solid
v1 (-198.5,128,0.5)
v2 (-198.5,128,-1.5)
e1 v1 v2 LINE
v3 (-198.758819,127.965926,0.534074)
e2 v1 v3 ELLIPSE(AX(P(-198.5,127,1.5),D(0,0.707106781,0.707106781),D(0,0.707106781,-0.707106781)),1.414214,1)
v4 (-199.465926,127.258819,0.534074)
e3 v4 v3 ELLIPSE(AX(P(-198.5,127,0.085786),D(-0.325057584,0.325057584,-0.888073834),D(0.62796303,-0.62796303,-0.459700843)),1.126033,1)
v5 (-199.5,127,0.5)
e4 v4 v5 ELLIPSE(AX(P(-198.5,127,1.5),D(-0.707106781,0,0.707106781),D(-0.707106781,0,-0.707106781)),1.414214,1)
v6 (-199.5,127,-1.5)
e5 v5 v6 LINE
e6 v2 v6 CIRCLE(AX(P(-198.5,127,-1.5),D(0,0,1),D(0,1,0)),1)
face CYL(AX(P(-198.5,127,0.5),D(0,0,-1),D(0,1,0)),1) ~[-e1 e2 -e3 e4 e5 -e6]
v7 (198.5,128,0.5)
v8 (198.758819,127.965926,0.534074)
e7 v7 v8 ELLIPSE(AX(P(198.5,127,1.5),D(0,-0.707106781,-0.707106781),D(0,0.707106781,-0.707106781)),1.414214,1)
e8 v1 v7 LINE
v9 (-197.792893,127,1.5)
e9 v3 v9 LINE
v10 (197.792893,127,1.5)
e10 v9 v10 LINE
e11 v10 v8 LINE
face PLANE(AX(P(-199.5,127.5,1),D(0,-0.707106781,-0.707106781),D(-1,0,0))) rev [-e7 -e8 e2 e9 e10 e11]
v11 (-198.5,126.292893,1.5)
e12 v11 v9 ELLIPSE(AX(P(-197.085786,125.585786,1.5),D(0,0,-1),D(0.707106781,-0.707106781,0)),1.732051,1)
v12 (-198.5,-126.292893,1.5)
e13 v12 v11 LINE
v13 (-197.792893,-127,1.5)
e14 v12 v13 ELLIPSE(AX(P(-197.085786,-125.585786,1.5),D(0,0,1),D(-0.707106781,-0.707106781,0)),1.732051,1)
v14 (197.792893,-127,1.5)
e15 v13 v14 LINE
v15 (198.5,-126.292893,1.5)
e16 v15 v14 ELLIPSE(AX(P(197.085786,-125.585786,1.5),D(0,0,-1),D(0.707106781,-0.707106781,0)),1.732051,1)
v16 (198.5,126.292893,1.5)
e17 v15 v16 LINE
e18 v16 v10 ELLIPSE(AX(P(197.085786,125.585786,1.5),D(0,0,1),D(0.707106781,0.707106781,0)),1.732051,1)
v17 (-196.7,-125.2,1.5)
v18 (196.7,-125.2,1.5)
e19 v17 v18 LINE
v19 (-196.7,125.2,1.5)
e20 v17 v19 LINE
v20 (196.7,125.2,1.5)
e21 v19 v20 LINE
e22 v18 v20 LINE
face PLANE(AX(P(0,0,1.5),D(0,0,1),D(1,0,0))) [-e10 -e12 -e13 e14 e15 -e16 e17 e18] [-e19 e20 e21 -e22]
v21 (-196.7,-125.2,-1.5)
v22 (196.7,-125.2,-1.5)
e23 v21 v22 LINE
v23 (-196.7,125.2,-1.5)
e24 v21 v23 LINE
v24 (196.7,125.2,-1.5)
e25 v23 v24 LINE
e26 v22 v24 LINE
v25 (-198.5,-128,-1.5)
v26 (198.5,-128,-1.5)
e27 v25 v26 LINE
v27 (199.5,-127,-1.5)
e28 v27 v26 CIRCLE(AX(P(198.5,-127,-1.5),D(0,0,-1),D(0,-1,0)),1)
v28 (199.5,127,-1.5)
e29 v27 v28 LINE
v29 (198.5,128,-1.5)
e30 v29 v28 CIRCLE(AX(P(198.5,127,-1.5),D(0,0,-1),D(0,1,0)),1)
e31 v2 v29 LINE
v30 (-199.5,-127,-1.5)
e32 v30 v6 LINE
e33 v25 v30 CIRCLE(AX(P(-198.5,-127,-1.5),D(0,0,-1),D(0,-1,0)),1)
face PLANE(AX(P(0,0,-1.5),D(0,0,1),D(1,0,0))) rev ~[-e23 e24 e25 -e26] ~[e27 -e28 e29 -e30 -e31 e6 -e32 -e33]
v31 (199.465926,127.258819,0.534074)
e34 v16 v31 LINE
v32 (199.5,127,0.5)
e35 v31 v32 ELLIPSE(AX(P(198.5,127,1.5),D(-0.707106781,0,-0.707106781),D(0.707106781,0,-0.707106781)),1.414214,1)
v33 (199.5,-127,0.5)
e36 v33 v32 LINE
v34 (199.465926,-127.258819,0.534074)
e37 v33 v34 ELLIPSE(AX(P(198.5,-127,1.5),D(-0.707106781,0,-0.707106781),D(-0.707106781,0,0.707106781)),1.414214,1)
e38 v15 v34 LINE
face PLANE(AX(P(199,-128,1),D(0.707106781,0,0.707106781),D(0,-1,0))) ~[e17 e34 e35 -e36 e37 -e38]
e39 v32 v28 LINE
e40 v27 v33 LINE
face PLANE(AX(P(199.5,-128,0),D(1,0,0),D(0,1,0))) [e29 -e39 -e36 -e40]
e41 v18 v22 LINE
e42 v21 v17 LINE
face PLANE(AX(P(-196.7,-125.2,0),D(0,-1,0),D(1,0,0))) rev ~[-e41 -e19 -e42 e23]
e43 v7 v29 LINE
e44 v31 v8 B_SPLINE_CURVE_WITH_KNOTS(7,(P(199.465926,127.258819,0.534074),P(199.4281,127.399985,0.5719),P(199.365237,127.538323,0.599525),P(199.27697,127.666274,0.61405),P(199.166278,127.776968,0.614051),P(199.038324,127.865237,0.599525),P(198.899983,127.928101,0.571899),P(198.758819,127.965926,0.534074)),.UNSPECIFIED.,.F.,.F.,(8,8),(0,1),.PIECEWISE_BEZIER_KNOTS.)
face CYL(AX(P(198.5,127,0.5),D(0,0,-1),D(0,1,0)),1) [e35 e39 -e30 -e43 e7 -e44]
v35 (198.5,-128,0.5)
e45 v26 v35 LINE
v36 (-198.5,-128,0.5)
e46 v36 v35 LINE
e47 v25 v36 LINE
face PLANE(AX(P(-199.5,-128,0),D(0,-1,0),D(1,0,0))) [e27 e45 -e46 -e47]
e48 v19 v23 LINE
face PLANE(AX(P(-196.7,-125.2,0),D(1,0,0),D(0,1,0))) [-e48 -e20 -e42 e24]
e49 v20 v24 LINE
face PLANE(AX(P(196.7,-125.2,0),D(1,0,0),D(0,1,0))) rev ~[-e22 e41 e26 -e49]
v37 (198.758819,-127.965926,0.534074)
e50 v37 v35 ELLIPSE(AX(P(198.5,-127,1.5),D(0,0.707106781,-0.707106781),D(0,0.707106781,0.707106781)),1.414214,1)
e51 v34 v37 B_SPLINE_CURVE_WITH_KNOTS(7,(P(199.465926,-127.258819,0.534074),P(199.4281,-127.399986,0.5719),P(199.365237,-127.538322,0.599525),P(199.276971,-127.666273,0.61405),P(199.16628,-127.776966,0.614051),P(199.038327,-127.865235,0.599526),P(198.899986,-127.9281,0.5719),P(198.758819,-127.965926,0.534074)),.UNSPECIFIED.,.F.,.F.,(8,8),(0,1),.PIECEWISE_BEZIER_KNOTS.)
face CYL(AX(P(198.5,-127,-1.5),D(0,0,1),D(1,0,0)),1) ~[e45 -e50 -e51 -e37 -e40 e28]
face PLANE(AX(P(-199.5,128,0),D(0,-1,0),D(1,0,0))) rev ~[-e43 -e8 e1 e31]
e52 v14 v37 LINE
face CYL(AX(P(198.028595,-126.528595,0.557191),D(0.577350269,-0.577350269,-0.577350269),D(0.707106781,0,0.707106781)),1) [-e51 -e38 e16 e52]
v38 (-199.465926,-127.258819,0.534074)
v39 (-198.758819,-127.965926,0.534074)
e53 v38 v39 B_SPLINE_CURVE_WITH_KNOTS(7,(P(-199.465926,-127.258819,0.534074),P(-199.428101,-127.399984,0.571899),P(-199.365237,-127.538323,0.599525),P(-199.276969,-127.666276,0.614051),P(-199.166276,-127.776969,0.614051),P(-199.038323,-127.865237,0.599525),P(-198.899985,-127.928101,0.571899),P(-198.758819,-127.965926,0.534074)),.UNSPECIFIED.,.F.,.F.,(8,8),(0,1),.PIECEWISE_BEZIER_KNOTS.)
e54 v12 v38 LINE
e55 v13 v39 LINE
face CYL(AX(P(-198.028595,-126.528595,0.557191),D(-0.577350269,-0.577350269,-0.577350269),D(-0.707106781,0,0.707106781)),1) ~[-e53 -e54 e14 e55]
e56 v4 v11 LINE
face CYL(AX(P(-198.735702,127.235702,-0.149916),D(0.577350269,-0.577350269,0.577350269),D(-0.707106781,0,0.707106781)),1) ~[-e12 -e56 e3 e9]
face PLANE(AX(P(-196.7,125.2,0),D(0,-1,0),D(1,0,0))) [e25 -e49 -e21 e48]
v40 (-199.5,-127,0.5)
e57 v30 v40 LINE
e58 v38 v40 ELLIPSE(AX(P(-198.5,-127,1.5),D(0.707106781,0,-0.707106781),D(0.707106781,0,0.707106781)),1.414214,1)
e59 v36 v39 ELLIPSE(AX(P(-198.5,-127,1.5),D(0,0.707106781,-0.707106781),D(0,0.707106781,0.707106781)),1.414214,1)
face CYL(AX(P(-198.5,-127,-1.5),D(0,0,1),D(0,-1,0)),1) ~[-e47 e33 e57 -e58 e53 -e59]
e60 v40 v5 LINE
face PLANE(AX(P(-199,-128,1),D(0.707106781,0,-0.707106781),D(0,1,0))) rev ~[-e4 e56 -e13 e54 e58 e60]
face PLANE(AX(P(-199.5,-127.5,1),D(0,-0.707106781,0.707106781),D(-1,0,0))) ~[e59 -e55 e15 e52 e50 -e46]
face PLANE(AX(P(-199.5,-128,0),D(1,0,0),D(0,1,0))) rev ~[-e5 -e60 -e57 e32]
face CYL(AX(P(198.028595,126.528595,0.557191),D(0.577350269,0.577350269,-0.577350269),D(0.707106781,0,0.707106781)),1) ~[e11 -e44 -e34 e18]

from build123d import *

# Parameters (mm, degrees)
F0_W     = 399
F0_H     = 256
F0_W_2   = 393.4
F0_H_2   = 250.4
F1_DEPTH = 1.5
F2_SIZE  = 1
F3_F1_R  = 1
F3_F2_R  = 1
F3_F3_R  = 1
F3_F4_R  = 1
F3_F5_R  = 1
F3_F6_R  = 1
F3_F7_R  = 1
F3_F8_R  = 1


with BuildPart() as f1:
    # F0 (on Top) → F1 (new body, symmetric)
    with BuildSketch(Plane.XY):
        Rectangle(F0_W, F0_H)
        Rectangle(F0_W_2, F0_H_2, mode=Mode.SUBTRACT)
    extrude(amount=F1_DEPTH, both=True)

    # F2
    f2_edges = [f1.edges().sort_by_distance(p)[0] for p in [
        (0, -128, 1.5),
        (-199.5, 0, 1.5),
        (0, 128, 1.5),
        (199.5, 0, 1.5),
    ]]
    chamfer(f2_edges, length=F2_SIZE)

    # F3: fillet of radius 1 on 8 edges, made by hand

    # F3_f1
    f3_f1_edges = [f1.edges().sort_by_distance(p)[0] for p in [
        (199.5, 128, -0.5),
    ]]
    fillet(f3_f1_edges, radius=F3_F1_R)

    # F3_f2
    f3_f2_edges = [f1.edges().sort_by_distance(p)[0] for p in [
        (199.5, -128, -0.5),
    ]]
    fillet(f3_f2_edges, radius=F3_F2_R)

    # F3_f3
    f3_f3_edges = [f1.edges().sort_by_distance(p)[0] for p in [
        (-199.5, 128, -0.5),
    ]]
    fillet(f3_f3_edges, radius=F3_F3_R)

    # F3_f4
    f3_f4_edges = [f1.edges().sort_by_distance(p)[0] for p in [
        (198.8535533906, -127.3535533906, 1.1464466094),
    ]]
    fillet(f3_f4_edges, radius=F3_F4_R)

    # F3_f5
    f3_f5_edges = [f1.edges().sort_by_distance(p)[0] for p in [
        (198.8535533906, 127.3535533906, 1.1464466094),
    ]]
    fillet(f3_f5_edges, radius=F3_F5_R)

    # F3_f6
    f3_f6_edges = [f1.edges().sort_by_distance(p)[0] for p in [
        (-199.5, -128, -0.5),
    ]]
    fillet(f3_f6_edges, radius=F3_F6_R)

    # F3_f7
    f3_f7_edges = [f1.edges().sort_by_distance(p)[0] for p in [
        (-198.8535533906, 127.3535533906, 1.1464466094),
    ]]
    fillet(f3_f7_edges, radius=F3_F7_R)

    # F3_f8
    f3_f8_edges = [f1.edges().sort_by_distance(p)[0] for p in [
        (-198.8535533906, -127.3535533906, 1.1464466094),
    ]]
    fillet(f3_f8_edges, radius=F3_F8_R)


solid = f1.part
